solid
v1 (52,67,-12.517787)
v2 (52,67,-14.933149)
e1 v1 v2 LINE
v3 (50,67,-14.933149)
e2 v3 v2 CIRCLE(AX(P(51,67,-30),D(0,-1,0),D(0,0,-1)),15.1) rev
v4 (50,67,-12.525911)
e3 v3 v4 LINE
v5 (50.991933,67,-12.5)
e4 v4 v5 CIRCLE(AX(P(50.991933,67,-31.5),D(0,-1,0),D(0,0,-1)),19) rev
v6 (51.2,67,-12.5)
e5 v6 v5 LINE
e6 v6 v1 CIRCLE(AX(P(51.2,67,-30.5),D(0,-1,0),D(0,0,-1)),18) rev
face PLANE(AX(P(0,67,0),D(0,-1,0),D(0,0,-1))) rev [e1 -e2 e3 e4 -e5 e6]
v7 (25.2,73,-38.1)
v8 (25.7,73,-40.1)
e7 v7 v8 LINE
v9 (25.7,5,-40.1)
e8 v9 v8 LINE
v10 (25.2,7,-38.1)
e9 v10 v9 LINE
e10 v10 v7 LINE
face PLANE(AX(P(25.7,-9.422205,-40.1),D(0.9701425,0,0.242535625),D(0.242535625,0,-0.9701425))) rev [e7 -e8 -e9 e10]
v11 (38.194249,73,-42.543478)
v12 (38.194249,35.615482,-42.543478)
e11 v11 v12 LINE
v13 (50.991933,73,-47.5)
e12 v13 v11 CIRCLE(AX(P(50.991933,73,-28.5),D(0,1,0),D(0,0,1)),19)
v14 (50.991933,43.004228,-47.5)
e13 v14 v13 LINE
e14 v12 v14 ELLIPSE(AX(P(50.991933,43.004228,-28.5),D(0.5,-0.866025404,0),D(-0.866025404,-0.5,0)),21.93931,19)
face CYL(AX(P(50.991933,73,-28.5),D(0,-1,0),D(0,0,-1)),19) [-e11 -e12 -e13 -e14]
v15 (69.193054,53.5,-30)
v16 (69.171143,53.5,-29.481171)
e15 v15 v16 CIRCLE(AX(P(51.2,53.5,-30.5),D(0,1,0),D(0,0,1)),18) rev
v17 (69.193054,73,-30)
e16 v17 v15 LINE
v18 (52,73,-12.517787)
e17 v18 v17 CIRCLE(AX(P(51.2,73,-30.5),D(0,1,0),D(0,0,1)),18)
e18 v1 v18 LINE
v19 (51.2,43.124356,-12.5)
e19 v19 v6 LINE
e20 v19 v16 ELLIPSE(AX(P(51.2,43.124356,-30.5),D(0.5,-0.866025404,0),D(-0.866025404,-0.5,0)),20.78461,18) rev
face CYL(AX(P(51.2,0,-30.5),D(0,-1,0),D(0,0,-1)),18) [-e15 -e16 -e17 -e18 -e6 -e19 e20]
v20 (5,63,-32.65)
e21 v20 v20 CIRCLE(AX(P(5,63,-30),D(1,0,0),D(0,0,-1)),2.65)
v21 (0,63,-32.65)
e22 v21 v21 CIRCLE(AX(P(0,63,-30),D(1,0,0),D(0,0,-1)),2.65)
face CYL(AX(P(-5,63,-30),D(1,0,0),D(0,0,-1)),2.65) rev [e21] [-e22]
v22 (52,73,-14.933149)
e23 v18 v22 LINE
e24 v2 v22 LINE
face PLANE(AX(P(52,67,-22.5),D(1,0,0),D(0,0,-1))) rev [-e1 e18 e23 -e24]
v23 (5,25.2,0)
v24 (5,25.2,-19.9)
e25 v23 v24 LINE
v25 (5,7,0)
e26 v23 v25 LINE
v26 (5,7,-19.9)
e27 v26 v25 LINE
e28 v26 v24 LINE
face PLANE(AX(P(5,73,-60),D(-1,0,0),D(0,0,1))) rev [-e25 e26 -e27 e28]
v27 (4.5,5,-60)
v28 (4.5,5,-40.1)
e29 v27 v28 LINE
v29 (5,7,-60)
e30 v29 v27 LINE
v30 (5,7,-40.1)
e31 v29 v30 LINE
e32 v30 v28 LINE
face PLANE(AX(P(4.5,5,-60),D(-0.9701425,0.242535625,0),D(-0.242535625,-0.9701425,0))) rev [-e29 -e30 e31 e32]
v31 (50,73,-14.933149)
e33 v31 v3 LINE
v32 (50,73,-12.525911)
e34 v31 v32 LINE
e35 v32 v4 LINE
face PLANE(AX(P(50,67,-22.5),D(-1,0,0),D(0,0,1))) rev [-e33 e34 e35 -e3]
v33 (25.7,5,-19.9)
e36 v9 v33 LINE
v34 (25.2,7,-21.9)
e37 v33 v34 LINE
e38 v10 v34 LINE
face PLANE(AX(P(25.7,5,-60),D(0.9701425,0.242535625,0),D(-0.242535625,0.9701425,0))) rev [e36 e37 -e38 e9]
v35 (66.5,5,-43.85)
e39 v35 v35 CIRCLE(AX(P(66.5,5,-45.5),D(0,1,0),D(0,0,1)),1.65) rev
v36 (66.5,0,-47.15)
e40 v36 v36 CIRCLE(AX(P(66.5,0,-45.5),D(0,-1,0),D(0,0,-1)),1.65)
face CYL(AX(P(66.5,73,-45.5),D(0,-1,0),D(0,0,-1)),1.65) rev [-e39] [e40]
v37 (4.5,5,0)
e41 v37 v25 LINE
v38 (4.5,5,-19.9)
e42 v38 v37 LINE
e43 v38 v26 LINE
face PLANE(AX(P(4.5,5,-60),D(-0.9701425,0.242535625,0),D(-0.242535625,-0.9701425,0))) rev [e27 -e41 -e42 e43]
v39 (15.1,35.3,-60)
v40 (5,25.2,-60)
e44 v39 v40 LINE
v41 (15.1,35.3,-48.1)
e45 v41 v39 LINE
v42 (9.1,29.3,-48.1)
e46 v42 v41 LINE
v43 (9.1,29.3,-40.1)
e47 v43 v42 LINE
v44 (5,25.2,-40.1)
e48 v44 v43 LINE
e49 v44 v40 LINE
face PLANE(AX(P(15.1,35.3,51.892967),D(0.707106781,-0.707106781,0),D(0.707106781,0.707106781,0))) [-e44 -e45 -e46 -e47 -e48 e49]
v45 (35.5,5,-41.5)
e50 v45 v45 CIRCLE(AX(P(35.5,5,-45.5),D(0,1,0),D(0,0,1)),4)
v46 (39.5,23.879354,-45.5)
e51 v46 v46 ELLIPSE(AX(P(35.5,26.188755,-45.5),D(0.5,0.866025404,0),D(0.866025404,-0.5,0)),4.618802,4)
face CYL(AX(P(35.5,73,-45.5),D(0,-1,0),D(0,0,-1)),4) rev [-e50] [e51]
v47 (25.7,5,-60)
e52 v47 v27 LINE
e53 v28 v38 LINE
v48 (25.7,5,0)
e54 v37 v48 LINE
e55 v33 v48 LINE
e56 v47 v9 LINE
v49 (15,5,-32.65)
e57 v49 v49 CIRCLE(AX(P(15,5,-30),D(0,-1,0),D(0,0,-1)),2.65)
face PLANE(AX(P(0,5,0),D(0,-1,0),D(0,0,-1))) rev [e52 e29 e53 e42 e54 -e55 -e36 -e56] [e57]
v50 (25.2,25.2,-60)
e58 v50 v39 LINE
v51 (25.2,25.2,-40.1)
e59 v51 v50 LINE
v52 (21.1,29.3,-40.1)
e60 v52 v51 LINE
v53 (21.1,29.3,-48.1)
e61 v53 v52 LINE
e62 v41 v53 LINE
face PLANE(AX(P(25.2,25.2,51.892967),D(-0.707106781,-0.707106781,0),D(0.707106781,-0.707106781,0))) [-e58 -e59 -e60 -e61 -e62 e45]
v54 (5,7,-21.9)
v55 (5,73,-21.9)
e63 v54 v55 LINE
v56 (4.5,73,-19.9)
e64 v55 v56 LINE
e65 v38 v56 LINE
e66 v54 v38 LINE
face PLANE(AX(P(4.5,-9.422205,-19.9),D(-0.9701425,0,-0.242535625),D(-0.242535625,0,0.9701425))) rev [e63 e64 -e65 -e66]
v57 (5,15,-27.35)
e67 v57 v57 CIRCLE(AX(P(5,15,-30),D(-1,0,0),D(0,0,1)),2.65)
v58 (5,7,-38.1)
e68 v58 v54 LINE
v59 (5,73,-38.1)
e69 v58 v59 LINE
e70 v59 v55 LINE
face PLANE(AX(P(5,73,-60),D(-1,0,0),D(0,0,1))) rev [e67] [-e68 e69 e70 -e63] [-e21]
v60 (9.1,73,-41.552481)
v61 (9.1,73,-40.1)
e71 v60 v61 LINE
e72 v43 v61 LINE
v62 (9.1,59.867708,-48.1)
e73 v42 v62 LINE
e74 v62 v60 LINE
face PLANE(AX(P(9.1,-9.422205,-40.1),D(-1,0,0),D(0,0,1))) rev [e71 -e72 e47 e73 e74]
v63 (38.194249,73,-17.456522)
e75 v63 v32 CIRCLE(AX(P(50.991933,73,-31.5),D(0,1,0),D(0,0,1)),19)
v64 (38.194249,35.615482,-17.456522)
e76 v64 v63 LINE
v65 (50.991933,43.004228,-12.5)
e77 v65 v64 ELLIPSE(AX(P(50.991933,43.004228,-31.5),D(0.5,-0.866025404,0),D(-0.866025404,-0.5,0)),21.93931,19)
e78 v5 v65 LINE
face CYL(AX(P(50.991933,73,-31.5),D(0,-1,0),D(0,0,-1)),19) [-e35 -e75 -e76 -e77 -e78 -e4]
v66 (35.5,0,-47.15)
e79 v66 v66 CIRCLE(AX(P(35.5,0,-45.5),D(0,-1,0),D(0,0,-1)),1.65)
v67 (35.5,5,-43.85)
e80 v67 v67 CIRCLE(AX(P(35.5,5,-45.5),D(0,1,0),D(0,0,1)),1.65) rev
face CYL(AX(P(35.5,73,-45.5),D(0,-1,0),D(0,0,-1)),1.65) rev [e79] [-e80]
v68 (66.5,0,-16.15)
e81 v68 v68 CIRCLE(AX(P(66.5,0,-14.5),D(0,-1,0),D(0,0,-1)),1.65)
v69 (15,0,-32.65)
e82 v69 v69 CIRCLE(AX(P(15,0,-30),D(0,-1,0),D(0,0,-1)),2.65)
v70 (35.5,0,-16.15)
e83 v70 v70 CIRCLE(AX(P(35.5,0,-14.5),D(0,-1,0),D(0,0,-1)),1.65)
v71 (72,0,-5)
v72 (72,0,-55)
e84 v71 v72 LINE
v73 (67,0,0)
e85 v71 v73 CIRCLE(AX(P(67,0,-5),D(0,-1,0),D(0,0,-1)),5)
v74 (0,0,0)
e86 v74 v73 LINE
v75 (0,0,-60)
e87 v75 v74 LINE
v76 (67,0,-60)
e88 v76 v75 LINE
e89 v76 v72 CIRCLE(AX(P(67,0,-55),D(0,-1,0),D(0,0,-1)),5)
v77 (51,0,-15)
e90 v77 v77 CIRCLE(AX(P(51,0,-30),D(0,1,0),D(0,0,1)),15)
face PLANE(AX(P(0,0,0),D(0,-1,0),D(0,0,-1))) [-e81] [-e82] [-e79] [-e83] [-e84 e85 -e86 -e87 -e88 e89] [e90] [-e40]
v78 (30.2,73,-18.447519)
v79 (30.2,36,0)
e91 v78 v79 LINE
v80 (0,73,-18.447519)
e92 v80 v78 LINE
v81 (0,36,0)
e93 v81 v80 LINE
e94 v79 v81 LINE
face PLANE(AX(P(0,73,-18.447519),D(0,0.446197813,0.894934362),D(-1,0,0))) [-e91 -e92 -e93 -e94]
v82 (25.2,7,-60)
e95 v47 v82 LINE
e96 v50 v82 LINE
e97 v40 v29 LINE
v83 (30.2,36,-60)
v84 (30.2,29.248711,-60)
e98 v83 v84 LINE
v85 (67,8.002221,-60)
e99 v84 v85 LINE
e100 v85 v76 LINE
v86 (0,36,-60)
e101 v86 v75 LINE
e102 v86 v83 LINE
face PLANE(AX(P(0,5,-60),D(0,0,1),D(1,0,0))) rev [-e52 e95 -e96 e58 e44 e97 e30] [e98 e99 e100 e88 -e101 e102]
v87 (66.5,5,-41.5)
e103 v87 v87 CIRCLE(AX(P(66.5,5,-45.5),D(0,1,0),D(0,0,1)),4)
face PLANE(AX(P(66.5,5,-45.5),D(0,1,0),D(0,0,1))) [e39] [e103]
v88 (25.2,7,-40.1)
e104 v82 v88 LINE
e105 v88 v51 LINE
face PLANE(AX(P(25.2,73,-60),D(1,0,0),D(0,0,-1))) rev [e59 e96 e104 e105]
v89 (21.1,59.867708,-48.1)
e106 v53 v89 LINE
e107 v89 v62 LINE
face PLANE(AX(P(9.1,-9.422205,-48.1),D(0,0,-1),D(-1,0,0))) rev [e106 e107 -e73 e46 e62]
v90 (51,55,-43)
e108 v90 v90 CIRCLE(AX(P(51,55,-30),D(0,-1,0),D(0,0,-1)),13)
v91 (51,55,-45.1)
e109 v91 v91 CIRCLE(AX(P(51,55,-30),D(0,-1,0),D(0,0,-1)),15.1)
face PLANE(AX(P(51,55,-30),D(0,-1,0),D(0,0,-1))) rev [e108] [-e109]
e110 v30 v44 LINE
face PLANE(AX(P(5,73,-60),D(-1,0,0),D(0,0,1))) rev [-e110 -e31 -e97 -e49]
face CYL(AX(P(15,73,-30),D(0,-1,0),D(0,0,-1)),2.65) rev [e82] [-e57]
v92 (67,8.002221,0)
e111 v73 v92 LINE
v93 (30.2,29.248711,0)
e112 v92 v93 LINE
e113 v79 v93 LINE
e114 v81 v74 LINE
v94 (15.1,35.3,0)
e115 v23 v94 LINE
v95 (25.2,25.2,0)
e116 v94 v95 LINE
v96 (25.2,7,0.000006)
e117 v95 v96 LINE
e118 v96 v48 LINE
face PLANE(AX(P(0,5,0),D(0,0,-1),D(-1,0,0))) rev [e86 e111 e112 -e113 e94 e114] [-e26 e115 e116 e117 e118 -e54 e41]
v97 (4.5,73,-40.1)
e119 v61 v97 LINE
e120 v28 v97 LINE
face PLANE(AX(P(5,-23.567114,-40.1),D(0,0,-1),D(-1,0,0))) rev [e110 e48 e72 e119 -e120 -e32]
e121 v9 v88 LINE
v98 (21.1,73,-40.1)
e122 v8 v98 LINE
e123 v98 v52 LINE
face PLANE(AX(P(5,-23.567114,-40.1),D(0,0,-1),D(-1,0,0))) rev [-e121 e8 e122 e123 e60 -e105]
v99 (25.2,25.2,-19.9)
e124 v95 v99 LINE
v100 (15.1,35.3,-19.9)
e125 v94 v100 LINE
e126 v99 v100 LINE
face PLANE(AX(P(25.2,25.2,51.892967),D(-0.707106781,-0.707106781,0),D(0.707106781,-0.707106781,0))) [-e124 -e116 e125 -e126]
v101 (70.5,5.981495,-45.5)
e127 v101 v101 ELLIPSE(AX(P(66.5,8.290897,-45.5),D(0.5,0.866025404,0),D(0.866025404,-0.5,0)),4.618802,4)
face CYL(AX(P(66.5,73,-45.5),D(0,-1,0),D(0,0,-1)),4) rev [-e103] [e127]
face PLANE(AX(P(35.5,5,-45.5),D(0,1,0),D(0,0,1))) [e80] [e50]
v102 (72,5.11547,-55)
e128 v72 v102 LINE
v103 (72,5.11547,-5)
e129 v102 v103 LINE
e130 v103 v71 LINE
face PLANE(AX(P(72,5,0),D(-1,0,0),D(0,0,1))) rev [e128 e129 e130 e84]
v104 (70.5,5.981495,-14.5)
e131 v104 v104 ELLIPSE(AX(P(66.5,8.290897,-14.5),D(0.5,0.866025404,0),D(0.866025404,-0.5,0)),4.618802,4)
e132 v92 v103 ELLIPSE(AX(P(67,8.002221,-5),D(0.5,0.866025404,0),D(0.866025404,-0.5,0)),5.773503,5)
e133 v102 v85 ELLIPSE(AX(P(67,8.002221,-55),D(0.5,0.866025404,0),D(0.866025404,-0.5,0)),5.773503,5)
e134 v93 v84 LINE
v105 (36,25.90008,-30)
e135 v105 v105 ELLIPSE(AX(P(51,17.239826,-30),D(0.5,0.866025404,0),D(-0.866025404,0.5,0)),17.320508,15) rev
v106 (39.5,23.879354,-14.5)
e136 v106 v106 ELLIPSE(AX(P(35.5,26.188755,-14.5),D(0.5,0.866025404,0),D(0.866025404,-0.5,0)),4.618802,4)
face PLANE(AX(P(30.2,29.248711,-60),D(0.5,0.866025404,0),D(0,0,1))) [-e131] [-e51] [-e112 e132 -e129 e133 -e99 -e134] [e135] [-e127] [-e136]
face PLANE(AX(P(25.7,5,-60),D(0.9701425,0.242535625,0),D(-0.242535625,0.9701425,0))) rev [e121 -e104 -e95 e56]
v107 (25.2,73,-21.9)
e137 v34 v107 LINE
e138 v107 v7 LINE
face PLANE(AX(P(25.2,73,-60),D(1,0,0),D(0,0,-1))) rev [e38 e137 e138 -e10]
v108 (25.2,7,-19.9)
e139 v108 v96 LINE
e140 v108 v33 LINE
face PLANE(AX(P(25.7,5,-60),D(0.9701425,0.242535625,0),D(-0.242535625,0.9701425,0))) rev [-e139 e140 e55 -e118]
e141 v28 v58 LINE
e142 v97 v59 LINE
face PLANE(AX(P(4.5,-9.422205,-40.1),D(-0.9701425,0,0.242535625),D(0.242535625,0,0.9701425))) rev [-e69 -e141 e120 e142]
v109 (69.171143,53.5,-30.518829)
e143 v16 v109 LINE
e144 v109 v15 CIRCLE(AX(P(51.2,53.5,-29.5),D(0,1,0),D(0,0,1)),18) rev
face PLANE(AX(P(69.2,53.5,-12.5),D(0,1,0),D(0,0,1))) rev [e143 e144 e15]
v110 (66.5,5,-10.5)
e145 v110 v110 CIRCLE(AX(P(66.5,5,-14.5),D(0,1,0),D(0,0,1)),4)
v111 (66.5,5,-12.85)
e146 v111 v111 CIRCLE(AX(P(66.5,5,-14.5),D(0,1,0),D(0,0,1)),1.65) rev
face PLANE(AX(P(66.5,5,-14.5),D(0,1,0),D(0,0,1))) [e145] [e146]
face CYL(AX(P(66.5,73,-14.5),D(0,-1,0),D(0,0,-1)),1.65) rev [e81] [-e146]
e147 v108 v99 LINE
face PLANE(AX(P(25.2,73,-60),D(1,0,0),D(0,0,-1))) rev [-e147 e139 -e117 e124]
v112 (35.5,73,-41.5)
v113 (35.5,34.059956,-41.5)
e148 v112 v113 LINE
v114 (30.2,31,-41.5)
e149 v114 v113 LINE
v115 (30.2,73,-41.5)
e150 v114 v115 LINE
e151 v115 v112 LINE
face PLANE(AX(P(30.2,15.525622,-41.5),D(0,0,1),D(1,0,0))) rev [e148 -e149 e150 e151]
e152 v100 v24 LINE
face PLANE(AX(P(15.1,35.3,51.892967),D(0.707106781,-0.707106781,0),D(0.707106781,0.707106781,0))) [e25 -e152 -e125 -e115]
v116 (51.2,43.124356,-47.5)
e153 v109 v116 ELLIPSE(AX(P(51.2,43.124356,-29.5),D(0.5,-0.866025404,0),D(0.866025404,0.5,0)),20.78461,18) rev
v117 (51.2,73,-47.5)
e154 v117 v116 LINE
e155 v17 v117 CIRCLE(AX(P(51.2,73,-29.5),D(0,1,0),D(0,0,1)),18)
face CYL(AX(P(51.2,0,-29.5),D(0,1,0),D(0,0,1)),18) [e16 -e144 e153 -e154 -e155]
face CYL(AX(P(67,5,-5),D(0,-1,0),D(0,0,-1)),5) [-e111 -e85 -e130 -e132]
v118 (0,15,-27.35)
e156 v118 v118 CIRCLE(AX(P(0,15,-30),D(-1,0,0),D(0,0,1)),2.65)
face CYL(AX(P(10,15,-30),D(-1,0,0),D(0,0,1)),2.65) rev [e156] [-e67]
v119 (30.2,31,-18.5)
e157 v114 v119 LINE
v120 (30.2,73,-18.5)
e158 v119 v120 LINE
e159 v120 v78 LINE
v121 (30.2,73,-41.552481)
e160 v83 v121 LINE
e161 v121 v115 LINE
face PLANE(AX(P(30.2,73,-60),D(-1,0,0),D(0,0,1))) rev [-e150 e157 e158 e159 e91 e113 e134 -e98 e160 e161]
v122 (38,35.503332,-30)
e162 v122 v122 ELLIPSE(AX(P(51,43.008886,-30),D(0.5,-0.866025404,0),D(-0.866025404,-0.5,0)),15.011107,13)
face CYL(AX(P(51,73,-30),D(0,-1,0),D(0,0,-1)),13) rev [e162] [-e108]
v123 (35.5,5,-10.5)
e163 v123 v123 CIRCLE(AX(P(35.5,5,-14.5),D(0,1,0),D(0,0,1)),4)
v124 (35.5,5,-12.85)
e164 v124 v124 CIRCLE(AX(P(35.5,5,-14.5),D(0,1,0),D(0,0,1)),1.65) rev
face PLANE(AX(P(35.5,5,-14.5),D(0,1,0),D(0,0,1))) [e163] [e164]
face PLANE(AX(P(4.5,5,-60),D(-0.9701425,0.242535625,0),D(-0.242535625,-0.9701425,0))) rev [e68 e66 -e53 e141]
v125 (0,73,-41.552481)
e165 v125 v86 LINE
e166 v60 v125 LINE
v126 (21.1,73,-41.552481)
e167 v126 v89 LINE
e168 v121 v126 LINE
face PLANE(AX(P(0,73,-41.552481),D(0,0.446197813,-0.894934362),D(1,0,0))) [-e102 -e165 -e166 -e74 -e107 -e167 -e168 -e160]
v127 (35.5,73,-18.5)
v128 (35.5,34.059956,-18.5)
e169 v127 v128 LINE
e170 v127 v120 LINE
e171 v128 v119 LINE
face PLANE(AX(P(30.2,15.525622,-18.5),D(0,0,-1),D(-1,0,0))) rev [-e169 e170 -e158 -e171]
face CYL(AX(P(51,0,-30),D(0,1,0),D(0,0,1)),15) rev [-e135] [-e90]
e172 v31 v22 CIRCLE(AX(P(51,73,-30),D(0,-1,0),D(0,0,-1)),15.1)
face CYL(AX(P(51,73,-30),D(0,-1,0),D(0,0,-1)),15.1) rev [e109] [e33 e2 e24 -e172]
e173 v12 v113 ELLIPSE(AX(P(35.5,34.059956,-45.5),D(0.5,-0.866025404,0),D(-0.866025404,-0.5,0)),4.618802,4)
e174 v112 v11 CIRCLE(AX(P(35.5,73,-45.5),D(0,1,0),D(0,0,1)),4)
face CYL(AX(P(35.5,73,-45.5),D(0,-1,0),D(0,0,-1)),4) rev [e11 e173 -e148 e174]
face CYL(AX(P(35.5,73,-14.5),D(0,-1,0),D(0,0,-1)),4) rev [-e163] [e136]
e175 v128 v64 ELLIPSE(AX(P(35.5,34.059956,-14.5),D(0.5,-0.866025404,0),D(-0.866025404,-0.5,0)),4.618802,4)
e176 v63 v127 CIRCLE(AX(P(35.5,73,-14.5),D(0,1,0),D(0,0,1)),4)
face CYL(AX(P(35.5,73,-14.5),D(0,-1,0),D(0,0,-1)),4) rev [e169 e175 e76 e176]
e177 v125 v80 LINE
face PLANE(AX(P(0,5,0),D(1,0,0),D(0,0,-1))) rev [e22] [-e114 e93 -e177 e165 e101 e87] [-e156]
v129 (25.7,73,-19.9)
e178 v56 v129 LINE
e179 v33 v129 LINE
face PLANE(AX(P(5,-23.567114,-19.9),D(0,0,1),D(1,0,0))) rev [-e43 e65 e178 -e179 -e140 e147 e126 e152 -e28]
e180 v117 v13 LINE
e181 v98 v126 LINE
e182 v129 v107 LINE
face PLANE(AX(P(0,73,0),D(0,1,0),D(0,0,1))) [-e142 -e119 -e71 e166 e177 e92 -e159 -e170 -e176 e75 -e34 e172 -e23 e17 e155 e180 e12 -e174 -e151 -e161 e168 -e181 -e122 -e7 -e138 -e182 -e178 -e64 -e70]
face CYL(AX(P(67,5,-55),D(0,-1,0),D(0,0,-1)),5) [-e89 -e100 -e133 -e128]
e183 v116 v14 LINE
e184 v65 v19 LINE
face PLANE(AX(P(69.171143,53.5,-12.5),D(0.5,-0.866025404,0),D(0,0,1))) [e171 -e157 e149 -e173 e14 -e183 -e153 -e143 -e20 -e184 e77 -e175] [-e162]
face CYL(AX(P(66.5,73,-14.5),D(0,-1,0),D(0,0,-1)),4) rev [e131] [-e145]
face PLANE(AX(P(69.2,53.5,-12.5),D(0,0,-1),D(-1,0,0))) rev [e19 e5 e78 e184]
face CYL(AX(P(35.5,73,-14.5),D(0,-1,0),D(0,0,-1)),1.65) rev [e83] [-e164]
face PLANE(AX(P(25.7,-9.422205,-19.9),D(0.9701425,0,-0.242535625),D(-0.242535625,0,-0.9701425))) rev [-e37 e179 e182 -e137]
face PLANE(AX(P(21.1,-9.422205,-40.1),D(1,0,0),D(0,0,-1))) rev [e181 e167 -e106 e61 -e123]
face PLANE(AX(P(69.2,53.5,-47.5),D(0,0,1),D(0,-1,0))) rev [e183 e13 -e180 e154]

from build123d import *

# Parameters (mm, degrees)
SKETCH1_W               = 72
SKETCH1_H               = 60
BOSS_EXTRUDE1_DEPTH     = 5
SKETCH2_W               = 5
SKETCH2_H               = 60
BOSS_EXTRUDE2_DEPTH     = 68
SKETCH3_W               = 5
SKETCH3_H               = 60
BOSS_EXTRUDE3_DEPTH     = 68
BOSS_EXTRUDE4_DEPTH     = 60
CHAMFER1_SIZE           = 42
CHAMFER1_SIZE_2         = 24.248711306
CUT_EXTRUDE8_REACH      = 120.798
SKETCH12_W              = 20.2
SKETCH12_H              = 20.2
CUT_EXTRUDE1_DEPTH      = 116.792918609
CUT_EXTRUDE1_DEPTH_BACK = 116.792918609
SKETCH5_R               = 15
SKETCH8_R               = 2.65
CUT_EXTRUDE5_DEPTH      = 10
CUT_EXTRUDE6_DEPTH      = 119.798148134
CUT_EXTRUDE6_DEPTH_BACK = 119.798148134
SKETCH9_R               = 2.65
FILLET1_R               = 5
SKETCH10_R              = 2.65
CUT_EXTRUDE7_DEPTH      = 10
CUT_EXTRUDE9_DEPTH      = 119.798148134
CUT_EXTRUDE9_DEPTH_BACK = 119.798148134
CUT_EXTRUDE10_REACH     = 120.798
SKETCH14_W              = 12
SKETCH14_H              = 8
SKETCH15_W              = 35
SKETCH15_H              = 19.5
BOSS_EXTRUDE5_DEPTH     = 39
SKETCH16_R              = 15.1
CUT_EXTRUDE11_DEPTH     = 109.669222874
SKETCH17_R              = 13
CUT_EXTRUDE12_DEPTH     = 108.917792787
FILLET2_R               = 18
CHAMFER2_START          = 51.76396
CHAMFER2_OUTLINE_R      = 13
CHAMFER2_DEPTH          = 1.73604
CHAMFER2_START_2        = 31
CHAMFER2_2_OUTLINE_R    = 13
CHAMFER2_2_DEPTH        = 20.76396
CHAMFER2_START_3        = -47.5
CHAMFER2_3_DEPTH        = 35
SKETCH6_R               = 1.65
CUT_EXTRUDE2_DEPTH      = 119.798148134
SKETCH7_R               = 4
CUT_EXTRUDE4_DEPTH      = 116.792918609
SKETCH18_W              = 2
SKETCH18_H              = 15
CUT_EXTRUDE13_DEPTH     = 6
CHAMFER3_DEPTH          = 34.854175091
CUT_EXTRUDE14_REACH     = 120.798
SKETCH19_W              = 5.3
SKETCH19_H              = 10
FILLET3_R               = 19


with BuildPart() as part:
    # Sketch1 → Boss-Extrude1 (new body)
    with BuildSketch(Plane(origin=(0, 0, 0), x_dir=(1, 0, 0), z_dir=(0, 1, 0))):
        with Locations((36, 30)):
            Rectangle(SKETCH1_W, SKETCH1_H)
    extrude(amount=BOSS_EXTRUDE1_DEPTH)

    # Sketch2 → Boss-Extrude2 (add)
    with BuildSketch(Plane(origin=(0, 5, 0), x_dir=(1, 0, 0), z_dir=(0, 1, 0))):
        with Locations((2.5, 30)):
            Rectangle(SKETCH2_W, SKETCH2_H)
    extrude(amount=BOSS_EXTRUDE2_DEPTH)

    # Sketch3 → Boss-Extrude3 (add)
    with BuildSketch(Plane(origin=(0, 5, 0), x_dir=(1, 0, 0), z_dir=(0, 1, 0))):
        with Locations((27.7, 30)):
            Rectangle(SKETCH3_W, SKETCH3_H)
    extrude(amount=BOSS_EXTRUDE3_DEPTH)

    # Sketch11 → Boss-Extrude4 (add)
    with BuildSketch(Plane(origin=(0, 0, -60), x_dir=(-1, 0, 0), z_dir=(0, 0, -1))):
        Polygon((-25.2, 25.2), (-15.1, 35.3), (-5, 25.2), (-5, 73), (-25.2, 73), align=None)
    extrude(amount=-BOSS_EXTRUDE4_DEPTH)

    # Chamfer1
    # the kernel refuses this chamfer: 42, 24.248711306 mm, written as the material it adds along each edge
    with BuildSketch(Plane(origin=(30.2, 5, -60), x_dir=(1, 0, 0), z_dir=(0, 0, 1))) as chamfer1_piece_1_section:
        Polygon((CHAMFER1_SIZE, 0), (0, CHAMFER1_SIZE_2), (0, 0), align=None)
    chamfer1_piece_1 = extrude(amount=60, mode=Mode.PRIVATE)
    chamfer1_piece_1 = split(chamfer1_piece_1, bisect_by=Plane(origin=(72, 5, -60), z_dir=(-1, 0, 0)), keep=Keep.TOP, mode=Mode.PRIVATE)
    add(chamfer1_piece_1)

    # Cut-Extrude8: up to this face of the body (flat: up to its plane)
    cut_extrude8_end = Plane(part.part.faces().sort_by_distance((15.1, 5, -30))[0])
    # Sketch12 → Cut-Extrude8 (cut, up to the picked face)
    with BuildSketch(Plane(origin=(0, 73, 0), x_dir=(1, 0, 0), z_dir=(0, 1, 0)), mode=Mode.PRIVATE) as cut_extrude8_sk1:
        with Locations((15.1, 30)):
            Rectangle(SKETCH12_W, SKETCH12_H)
    cut_extrude8_tool1 = split(extrude(cut_extrude8_sk1.sketch, amount=-CUT_EXTRUDE8_REACH, mode=Mode.PRIVATE), bisect_by=cut_extrude8_end, keep=Keep.BOTH, mode=Mode.PRIVATE)
    add(cut_extrude8_tool1.solids().sort_by(Axis((15.1, 73, -30), (0, -1, 0)))[0], mode=Mode.SUBTRACT)

    # Sketch5 → Cut-Extrude1 (cut, two sides: drawn at the far end of the back side and taken through both)
    with BuildSketch(Plane(origin=(0, 5, 0), x_dir=(1, 0, 0), z_dir=(0, 1, 0)).offset(-CUT_EXTRUDE1_DEPTH_BACK)):
        with Locations(Location((51, 30, 0), (0, 0, 270))):
            Circle(SKETCH5_R)
    extrude(amount=CUT_EXTRUDE1_DEPTH + CUT_EXTRUDE1_DEPTH_BACK, mode=Mode.SUBTRACT)

    # Sketch8 → Cut-Extrude5 (cut)
    with BuildSketch(Plane(origin=(5, 0, 0), x_dir=(0, 0, -1), z_dir=(1, 0, 0))):
        with Locations((30, 63)):
            Circle(SKETCH8_R)
    extrude(amount=-CUT_EXTRUDE5_DEPTH, mode=Mode.SUBTRACT)

    # Sketch9 → Cut-Extrude6 (cut, two sides: drawn at the far end of the back side and taken through both)
    with BuildSketch(Plane.XZ.offset(-CUT_EXTRUDE6_DEPTH_BACK)):
        with Locations(Location((15, -30, 0), (0, 0, 270))):
            Circle(SKETCH9_R)
    extrude(amount=CUT_EXTRUDE6_DEPTH + CUT_EXTRUDE6_DEPTH_BACK, mode=Mode.SUBTRACT)

    # Fillet1
    fillet1_edges = [part.edges().sort_by_distance(p)[0] for p in [
        (72, 2.557735027, -60),
        (72, 2.557735027, 0),
    ]]
    fillet(fillet1_edges, radius=FILLET1_R)

    # Sketch10 → Cut-Extrude7 (cut)
    with BuildSketch(Plane.ZY):
        with Locations((-30, 15)):
            Circle(SKETCH10_R)
    extrude(amount=-CUT_EXTRUDE7_DEPTH, mode=Mode.SUBTRACT)

    # Sketch13 → Cut-Extrude9 (cut, two sides: drawn at the far end of the back side and taken through both)
    with BuildSketch(Plane.XY.offset(-CUT_EXTRUDE9_DEPTH_BACK)):
        Polygon((5, 5), (4.5, 5), (5, 7), align=None)
        Polygon((25.2, 5), (25.7, 5), (25.2, 7), align=None)
    extrude(amount=CUT_EXTRUDE9_DEPTH + CUT_EXTRUDE9_DEPTH_BACK, mode=Mode.SUBTRACT)

    # Cut-Extrude10: up to this face of the body (flat: up to its plane)
    cut_extrude10_end = Plane(part.part.faces().sort_by_distance((24.566909169, 5, -30))[0])
    # Sketch14 → Cut-Extrude10 (cut, up to the picked face)
    with BuildSketch(Plane(origin=(0, 73, 0), x_dir=(1, 0, 0), z_dir=(0, 1, 0)), mode=Mode.PRIVATE) as cut_extrude10_sk1:
        with Locations((15.1, 44.1)):
            Rectangle(SKETCH14_W, SKETCH14_H)
    cut_extrude10_tool1 = split(extrude(cut_extrude10_sk1.sketch, amount=-CUT_EXTRUDE10_REACH, mode=Mode.PRIVATE), bisect_by=cut_extrude10_end, keep=Keep.BOTH, mode=Mode.PRIVATE)
    # Sketch14 → Cut-Extrude10 (cut, up to the picked face)
    with BuildSketch(Plane(origin=(0, 73, 0), x_dir=(1, 0, 0), z_dir=(0, 1, 0)), mode=Mode.PRIVATE) as cut_extrude10_sk2:
        Polygon((25.2, 19.9), (25.7, 19.9), (25.2, 21.9), align=None)
    cut_extrude10_tool2 = split(extrude(cut_extrude10_sk2.sketch, amount=-CUT_EXTRUDE10_REACH, mode=Mode.PRIVATE), bisect_by=cut_extrude10_end, keep=Keep.BOTH, mode=Mode.PRIVATE)
    # Sketch14 → Cut-Extrude10 (cut, up to the picked face)
    with BuildSketch(Plane(origin=(0, 73, 0), x_dir=(1, 0, 0), z_dir=(0, 1, 0)), mode=Mode.PRIVATE) as cut_extrude10_sk3:
        Polygon((5, 19.9), (4.5, 19.9), (5, 21.9), align=None)
    cut_extrude10_tool3 = split(extrude(cut_extrude10_sk3.sketch, amount=-CUT_EXTRUDE10_REACH, mode=Mode.PRIVATE), bisect_by=cut_extrude10_end, keep=Keep.BOTH, mode=Mode.PRIVATE)
    # Sketch14 → Cut-Extrude10 (cut, up to the picked face)
    with BuildSketch(Plane(origin=(0, 73, 0), x_dir=(1, 0, 0), z_dir=(0, 1, 0)), mode=Mode.PRIVATE) as cut_extrude10_sk4:
        Polygon((25.2, 40.1), (25.7, 40.1), (25.2, 38.1), align=None)
    cut_extrude10_tool4 = split(extrude(cut_extrude10_sk4.sketch, amount=-CUT_EXTRUDE10_REACH, mode=Mode.PRIVATE), bisect_by=cut_extrude10_end, keep=Keep.BOTH, mode=Mode.PRIVATE)
    # Sketch14 → Cut-Extrude10 (cut, up to the picked face)
    with BuildSketch(Plane(origin=(0, 73, 0), x_dir=(1, 0, 0), z_dir=(0, 1, 0)), mode=Mode.PRIVATE) as cut_extrude10_sk5:
        Polygon((5, 40.1), (4.5, 40.1), (5, 38.1), align=None)
    cut_extrude10_tool5 = split(extrude(cut_extrude10_sk5.sketch, amount=-CUT_EXTRUDE10_REACH, mode=Mode.PRIVATE), bisect_by=cut_extrude10_end, keep=Keep.BOTH, mode=Mode.PRIVATE)
    add(cut_extrude10_tool1.solids().sort_by(Axis((15.1, 73, -44.1), (0, -1, 0)))[0], mode=Mode.SUBTRACT)
    add(cut_extrude10_tool2.solids().sort_by(Axis((25.366667, 73, -20.566667), (0, -1, 0)))[0], mode=Mode.SUBTRACT)
    add(cut_extrude10_tool3.solids().sort_by(Axis((4.833333, 73, -20.566667), (0, -1, 0)))[0], mode=Mode.SUBTRACT)
    add(cut_extrude10_tool4.solids().sort_by(Axis((25.366667, 73, -39.433333), (0, -1, 0)))[0], mode=Mode.SUBTRACT)
    add(cut_extrude10_tool5.solids().sort_by(Axis((4.833333, 73, -39.433333), (0, -1, 0)))[0], mode=Mode.SUBTRACT)

    # Sketch15 → Boss-Extrude5 (add)
    with BuildSketch(Plane(origin=(30.2, 0, 0), x_dir=(0, 0, -1), z_dir=(1, 0, 0))):
        with Locations((30, 63.25)):
            Rectangle(SKETCH15_W, SKETCH15_H)
    extrude(amount=BOSS_EXTRUDE5_DEPTH)

    # Sketch16 → Cut-Extrude11 (cut, through all)
    with BuildSketch(Plane.XZ.offset(-55)):
        with Locations(Location((51, -30, 0), (0, 0, 270))):
            Circle(SKETCH16_R)
    extrude(amount=-CUT_EXTRUDE11_DEPTH, mode=Mode.SUBTRACT)

    # Sketch17 → Cut-Extrude12 (cut, through all)
    with BuildSketch(Plane.XZ.offset(-53.5)):
        with Locations(Location((51, -30, 0), (0, 0, 270))):
            Circle(SKETCH17_R)
    extrude(amount=-CUT_EXTRUDE12_DEPTH, mode=Mode.SUBTRACT)

    # Fillet2
    # the kernel refuses this fillet: 18 mm, written as the material it takes off along each edge
    with BuildSketch(Plane(origin=(69.2, 53.5, -47.5), x_dir=(-1, 0, 0), z_dir=(0, 1, 0)), Plane(origin=(69.2, 118, -12.5), x_dir=(-1, 0, 0), z_dir=(0, -1, 0))) as fillet2_piece_1:
        with BuildLine():
            CenterArc((FILLET2_R, FILLET2_R), FILLET2_R, 180, 90)
            Line((0, FILLET2_R), (0, 0))
            Line((0, 0), (FILLET2_R, 0))
        make_face()
    extrude(amount=64.5, mode=Mode.SUBTRACT)

    # Chamfer2: read off the stored shape, not the designer's step
    # Chamfer2 outline → Chamfer2 (add)
    with BuildSketch(Plane(origin=(0, 0, 0), x_dir=(1, 0, 0), z_dir=(0, 1, 0)).offset(CHAMFER2_START)):
        with BuildLine():
            Line((30.2, 12.5), (51.2, 12.5))
            ThreePointArc((51.2, 12.5), (63.749900398, 17.596512099), (69.193054215, 30))
            ThreePointArc((69.193054215, 30), (63.749900398, 42.403487901), (51.2, 47.5))
            Line((51.2, 47.5), (30.2, 47.5))
            Line((30.2, 47.5), (30.2, 12.5))
        make_face()
        with Locations((51, 30)):
            Circle(CHAMFER2_OUTLINE_R, mode=Mode.SUBTRACT)
    extrude(amount=CHAMFER2_DEPTH)

    # Chamfer2 2 outline → Chamfer2 2 (add)
    with BuildSketch(Plane(origin=(0, 0, 0), x_dir=(1, 0, 0), z_dir=(0, 1, 0)).offset(CHAMFER2_START_2)):
        with BuildLine():
            Line((30.2, 12.5), (51.2, 12.5))
            ThreePointArc((51.2, 12.5), (63.749900398, 17.596512099), (69.193054215, 30))
            ThreePointArc((69.193054215, 30), (63.749900398, 42.403487901), (51.2, 47.5))
            Line((51.2, 47.5), (30.2, 47.5))
            Line((30.2, 47.5), (30.2, 12.5))
        make_face()
        with Locations((51, 30)):
            Circle(CHAMFER2_2_OUTLINE_R, mode=Mode.SUBTRACT)
    extrude(amount=CHAMFER2_2_DEPTH)

    # Chamfer2 3 outline → Chamfer2 3 (cut)
    with BuildSketch(Plane.XY.offset(CHAMFER2_START_3)):
        Polygon((71, 53.5), (69.17114317, 53.5), (30.2, 31), (71, 31), align=None)
    extrude(amount=CHAMFER2_3_DEPTH, mode=Mode.SUBTRACT)

    # Sketch6 → Cut-Extrude2 (cut, through all)
    with BuildSketch(Plane.XZ):
        with Locations(Location((66.5, -14.5, 0), (0, 0, 270))):
            Circle(SKETCH6_R)
        with Locations(Location((66.5, -45.5, 0), (0, 0, 270))):
            Circle(SKETCH6_R)
        with Locations(Location((35.5, -45.5, 0), (0, 0, 270))):
            Circle(SKETCH6_R)
        with Locations(Location((35.5, -14.5, 0), (0, 0, 270))):
            Circle(SKETCH6_R)
    extrude(amount=-CUT_EXTRUDE2_DEPTH, mode=Mode.SUBTRACT)

    # Sketch7 → Cut-Extrude4 (cut, through all)
    with BuildSketch(Plane(origin=(0, 5, 0), x_dir=(1, 0, 0), z_dir=(0, 1, 0))):
        with Locations((66.5, 45.5)):
            Circle(SKETCH7_R)
        with Locations((66.5, 14.5)):
            Circle(SKETCH7_R)
        with Locations((35.5, 14.5)):
            Circle(SKETCH7_R)
        with Locations((35.5, 45.5)):
            Circle(SKETCH7_R)
    extrude(amount=CUT_EXTRUDE4_DEPTH, mode=Mode.SUBTRACT)

    # Sketch18 → Cut-Extrude13 (cut)
    with BuildSketch(Plane(origin=(0, 73, 0), x_dir=(1, 0, 0), z_dir=(0, 1, 0))):
        with Locations((51, 15)):
            Rectangle(SKETCH18_W, SKETCH18_H)
    extrude(amount=-CUT_EXTRUDE13_DEPTH, mode=Mode.SUBTRACT)

    # Chamfer3: read off the stored shape, not the designer's step
    # Chamfer3 outline → Chamfer3 (cut)
    with BuildSketch(Plane.YZ):
        Polygon((73, -41.552480502), (36, -60), (73, -60), align=None)
        Polygon((73, -18.447519498), (73, 0), (36, 0), align=None)
    extrude(amount=CHAMFER3_DEPTH, mode=Mode.SUBTRACT)

    # Cut-Extrude14: up to this plane
    cut_extrude14_end = Plane(origin=(69.17114317, 53.5, -12.5), z_dir=(0.4999999999999951, -0.8660254037844415, 0))
    # Sketch19 → Cut-Extrude14 (cut, up to the surface)
    with BuildSketch(Plane(origin=(0, 73, 0), x_dir=(1, 0, 0), z_dir=(0, 1, 0)), mode=Mode.PRIVATE) as cut_extrude14_sk1:
        with Locations((32.85, 46.5)):
            Rectangle(SKETCH19_W, SKETCH19_H)
    cut_extrude14_tool1 = split(extrude(cut_extrude14_sk1.sketch, amount=-CUT_EXTRUDE14_REACH, mode=Mode.PRIVATE), bisect_by=cut_extrude14_end, keep=Keep.BOTH, mode=Mode.PRIVATE)
    add(cut_extrude14_tool1.solids().sort_by_distance((32.85, 73, -46.5))[0], mode=Mode.SUBTRACT)
    # Sketch19 → Cut-Extrude14 (cut, up to the surface)
    with BuildSketch(Plane(origin=(0, 73, 0), x_dir=(1, 0, 0), z_dir=(0, 1, 0)), mode=Mode.PRIVATE) as cut_extrude14_sk2:
        with Locations((32.85, 13.5)):
            Rectangle(SKETCH19_W, SKETCH19_H)
    cut_extrude14_tool2 = split(extrude(cut_extrude14_sk2.sketch, amount=-CUT_EXTRUDE14_REACH, mode=Mode.PRIVATE), bisect_by=cut_extrude14_end, keep=Keep.BOTH, mode=Mode.PRIVATE)
    add(cut_extrude14_tool2.solids().sort_by_distance((32.85, 73, -13.5))[0], mode=Mode.SUBTRACT)

    # Fillet3
    # the kernel refuses this fillet: 19 mm, written as the material it takes off along each edge
    with BuildSketch(Plane(origin=(38.964101615, 103.069579424, -47.5), x_dir=(-0.15348078303454, 0, 0.9881516327159028), z_dir=(0, -1, 0))) as fillet3_piece_1:
        with BuildLine():
            CenterArc((16.928839983, -14.801456479), FILLET3_R, 128.828697274, 42.342605452)
            Line((-1.846041038, -11.885321601), (0, 0))
            ThreePointArc((0, 0), (2.507976294, -0.883903899), (5.015952588, 0))
        make_face()
    extrude(amount=49.569579424, mode=Mode.SUBTRACT)
    with BuildSketch(Plane(origin=(38.964101615, 103.069579424, -12.5), x_dir=(1, 0, 0), z_dir=(0, -1, 0))) as fillet3_piece_2:
        with BuildLine():
            CenterArc((12.02783177, -19), FILLET3_R, 90, 42.342605452)
            ThreePointArc((-0.769852331, -4.956521739), (0.488504916, -2.613923132), (0, 0))
            Line((0, 0), (12.02783177, 0))
        make_face()
    extrude(amount=49.569579424, mode=Mode.SUBTRACT)
    with BuildSketch(Plane(origin=(38.964101615, 53.5, -12.5), x_dir=(1, 0, 0), z_dir=(0, -1, 0))) as fillet3_piece_3:
        with BuildLine():
            CenterArc((12.02783177, -19), FILLET3_R, 90, 42.342605452)
            ThreePointArc((-0.769852331, -4.956521739), (0.488504916, -2.613923132), (0, 0))
            Line((0, 0), (12.02783177, 0))
        make_face()
    extrude(amount=1.73604, mode=Mode.SUBTRACT)
    with BuildSketch(Plane(origin=(38.964101615, 51.76396, -12.5), x_dir=(1, 0, 0), z_dir=(0, -1, 0))) as fillet3_piece_4_section:
        with BuildLine():
            CenterArc((12.02783177, -19), FILLET3_R, 90, 42.342605452)
            ThreePointArc((-0.769852331, -4.956521739), (0.488504916, -2.613923132), (0, 0))
            Line((0, 0), (12.02783177, 0))
        make_face()
    fillet3_piece_4 = extrude(amount=45.773582997, mode=Mode.PRIVATE)
    fillet3_piece_4 = split(fillet3_piece_4, bisect_by=Plane(origin=(45.764134633, 39.98595732, -12.5), z_dir=(-0.5000000000028844, 0.8660254037827734, 0)), keep=Keep.TOP, mode=Mode.PRIVATE)
    add(fillet3_piece_4, mode=Mode.SUBTRACT)
    with BuildSketch(Plane(origin=(38.964101615, 53.5, -47.5), x_dir=(1, 0, 0), z_dir=(0, -1, 0))) as fillet3_piece_5:
        with BuildLine():
            CenterArc((12.02783177, 19), FILLET3_R, 227.657394548, 42.342605452)
            ThreePointArc((-0.769852331, 4.956521739), (0.488504916, 2.613923132), (0, 0))
            Line((0, 0), (12.02783177, 0))
        make_face()
    extrude(amount=1.73604, mode=Mode.SUBTRACT)
    with BuildSketch(Plane(origin=(38.964101615, 51.76396, -47.5), x_dir=(1, 0, 0), z_dir=(0, -1, 0))) as fillet3_piece_6_section:
        with BuildLine():
            CenterArc((12.02783177, 19), FILLET3_R, 227.657394548, 42.342605452)
            ThreePointArc((-0.769852331, 4.956521739), (0.488504916, 2.613923132), (0, 0))
            Line((0, 0), (12.02783177, 0))
        make_face()
    fillet3_piece_6 = extrude(amount=45.773582997, mode=Mode.PRIVATE)
    fillet3_piece_6 = split(fillet3_piece_6, bisect_by=Plane(origin=(45.764134633, 39.98595732, -47.5), z_dir=(-0.5000000000028844, 0.8660254037827734, 0)), keep=Keep.TOP, mode=Mode.PRIVATE)
    add(fillet3_piece_6, mode=Mode.SUBTRACT)


solid = part.part
